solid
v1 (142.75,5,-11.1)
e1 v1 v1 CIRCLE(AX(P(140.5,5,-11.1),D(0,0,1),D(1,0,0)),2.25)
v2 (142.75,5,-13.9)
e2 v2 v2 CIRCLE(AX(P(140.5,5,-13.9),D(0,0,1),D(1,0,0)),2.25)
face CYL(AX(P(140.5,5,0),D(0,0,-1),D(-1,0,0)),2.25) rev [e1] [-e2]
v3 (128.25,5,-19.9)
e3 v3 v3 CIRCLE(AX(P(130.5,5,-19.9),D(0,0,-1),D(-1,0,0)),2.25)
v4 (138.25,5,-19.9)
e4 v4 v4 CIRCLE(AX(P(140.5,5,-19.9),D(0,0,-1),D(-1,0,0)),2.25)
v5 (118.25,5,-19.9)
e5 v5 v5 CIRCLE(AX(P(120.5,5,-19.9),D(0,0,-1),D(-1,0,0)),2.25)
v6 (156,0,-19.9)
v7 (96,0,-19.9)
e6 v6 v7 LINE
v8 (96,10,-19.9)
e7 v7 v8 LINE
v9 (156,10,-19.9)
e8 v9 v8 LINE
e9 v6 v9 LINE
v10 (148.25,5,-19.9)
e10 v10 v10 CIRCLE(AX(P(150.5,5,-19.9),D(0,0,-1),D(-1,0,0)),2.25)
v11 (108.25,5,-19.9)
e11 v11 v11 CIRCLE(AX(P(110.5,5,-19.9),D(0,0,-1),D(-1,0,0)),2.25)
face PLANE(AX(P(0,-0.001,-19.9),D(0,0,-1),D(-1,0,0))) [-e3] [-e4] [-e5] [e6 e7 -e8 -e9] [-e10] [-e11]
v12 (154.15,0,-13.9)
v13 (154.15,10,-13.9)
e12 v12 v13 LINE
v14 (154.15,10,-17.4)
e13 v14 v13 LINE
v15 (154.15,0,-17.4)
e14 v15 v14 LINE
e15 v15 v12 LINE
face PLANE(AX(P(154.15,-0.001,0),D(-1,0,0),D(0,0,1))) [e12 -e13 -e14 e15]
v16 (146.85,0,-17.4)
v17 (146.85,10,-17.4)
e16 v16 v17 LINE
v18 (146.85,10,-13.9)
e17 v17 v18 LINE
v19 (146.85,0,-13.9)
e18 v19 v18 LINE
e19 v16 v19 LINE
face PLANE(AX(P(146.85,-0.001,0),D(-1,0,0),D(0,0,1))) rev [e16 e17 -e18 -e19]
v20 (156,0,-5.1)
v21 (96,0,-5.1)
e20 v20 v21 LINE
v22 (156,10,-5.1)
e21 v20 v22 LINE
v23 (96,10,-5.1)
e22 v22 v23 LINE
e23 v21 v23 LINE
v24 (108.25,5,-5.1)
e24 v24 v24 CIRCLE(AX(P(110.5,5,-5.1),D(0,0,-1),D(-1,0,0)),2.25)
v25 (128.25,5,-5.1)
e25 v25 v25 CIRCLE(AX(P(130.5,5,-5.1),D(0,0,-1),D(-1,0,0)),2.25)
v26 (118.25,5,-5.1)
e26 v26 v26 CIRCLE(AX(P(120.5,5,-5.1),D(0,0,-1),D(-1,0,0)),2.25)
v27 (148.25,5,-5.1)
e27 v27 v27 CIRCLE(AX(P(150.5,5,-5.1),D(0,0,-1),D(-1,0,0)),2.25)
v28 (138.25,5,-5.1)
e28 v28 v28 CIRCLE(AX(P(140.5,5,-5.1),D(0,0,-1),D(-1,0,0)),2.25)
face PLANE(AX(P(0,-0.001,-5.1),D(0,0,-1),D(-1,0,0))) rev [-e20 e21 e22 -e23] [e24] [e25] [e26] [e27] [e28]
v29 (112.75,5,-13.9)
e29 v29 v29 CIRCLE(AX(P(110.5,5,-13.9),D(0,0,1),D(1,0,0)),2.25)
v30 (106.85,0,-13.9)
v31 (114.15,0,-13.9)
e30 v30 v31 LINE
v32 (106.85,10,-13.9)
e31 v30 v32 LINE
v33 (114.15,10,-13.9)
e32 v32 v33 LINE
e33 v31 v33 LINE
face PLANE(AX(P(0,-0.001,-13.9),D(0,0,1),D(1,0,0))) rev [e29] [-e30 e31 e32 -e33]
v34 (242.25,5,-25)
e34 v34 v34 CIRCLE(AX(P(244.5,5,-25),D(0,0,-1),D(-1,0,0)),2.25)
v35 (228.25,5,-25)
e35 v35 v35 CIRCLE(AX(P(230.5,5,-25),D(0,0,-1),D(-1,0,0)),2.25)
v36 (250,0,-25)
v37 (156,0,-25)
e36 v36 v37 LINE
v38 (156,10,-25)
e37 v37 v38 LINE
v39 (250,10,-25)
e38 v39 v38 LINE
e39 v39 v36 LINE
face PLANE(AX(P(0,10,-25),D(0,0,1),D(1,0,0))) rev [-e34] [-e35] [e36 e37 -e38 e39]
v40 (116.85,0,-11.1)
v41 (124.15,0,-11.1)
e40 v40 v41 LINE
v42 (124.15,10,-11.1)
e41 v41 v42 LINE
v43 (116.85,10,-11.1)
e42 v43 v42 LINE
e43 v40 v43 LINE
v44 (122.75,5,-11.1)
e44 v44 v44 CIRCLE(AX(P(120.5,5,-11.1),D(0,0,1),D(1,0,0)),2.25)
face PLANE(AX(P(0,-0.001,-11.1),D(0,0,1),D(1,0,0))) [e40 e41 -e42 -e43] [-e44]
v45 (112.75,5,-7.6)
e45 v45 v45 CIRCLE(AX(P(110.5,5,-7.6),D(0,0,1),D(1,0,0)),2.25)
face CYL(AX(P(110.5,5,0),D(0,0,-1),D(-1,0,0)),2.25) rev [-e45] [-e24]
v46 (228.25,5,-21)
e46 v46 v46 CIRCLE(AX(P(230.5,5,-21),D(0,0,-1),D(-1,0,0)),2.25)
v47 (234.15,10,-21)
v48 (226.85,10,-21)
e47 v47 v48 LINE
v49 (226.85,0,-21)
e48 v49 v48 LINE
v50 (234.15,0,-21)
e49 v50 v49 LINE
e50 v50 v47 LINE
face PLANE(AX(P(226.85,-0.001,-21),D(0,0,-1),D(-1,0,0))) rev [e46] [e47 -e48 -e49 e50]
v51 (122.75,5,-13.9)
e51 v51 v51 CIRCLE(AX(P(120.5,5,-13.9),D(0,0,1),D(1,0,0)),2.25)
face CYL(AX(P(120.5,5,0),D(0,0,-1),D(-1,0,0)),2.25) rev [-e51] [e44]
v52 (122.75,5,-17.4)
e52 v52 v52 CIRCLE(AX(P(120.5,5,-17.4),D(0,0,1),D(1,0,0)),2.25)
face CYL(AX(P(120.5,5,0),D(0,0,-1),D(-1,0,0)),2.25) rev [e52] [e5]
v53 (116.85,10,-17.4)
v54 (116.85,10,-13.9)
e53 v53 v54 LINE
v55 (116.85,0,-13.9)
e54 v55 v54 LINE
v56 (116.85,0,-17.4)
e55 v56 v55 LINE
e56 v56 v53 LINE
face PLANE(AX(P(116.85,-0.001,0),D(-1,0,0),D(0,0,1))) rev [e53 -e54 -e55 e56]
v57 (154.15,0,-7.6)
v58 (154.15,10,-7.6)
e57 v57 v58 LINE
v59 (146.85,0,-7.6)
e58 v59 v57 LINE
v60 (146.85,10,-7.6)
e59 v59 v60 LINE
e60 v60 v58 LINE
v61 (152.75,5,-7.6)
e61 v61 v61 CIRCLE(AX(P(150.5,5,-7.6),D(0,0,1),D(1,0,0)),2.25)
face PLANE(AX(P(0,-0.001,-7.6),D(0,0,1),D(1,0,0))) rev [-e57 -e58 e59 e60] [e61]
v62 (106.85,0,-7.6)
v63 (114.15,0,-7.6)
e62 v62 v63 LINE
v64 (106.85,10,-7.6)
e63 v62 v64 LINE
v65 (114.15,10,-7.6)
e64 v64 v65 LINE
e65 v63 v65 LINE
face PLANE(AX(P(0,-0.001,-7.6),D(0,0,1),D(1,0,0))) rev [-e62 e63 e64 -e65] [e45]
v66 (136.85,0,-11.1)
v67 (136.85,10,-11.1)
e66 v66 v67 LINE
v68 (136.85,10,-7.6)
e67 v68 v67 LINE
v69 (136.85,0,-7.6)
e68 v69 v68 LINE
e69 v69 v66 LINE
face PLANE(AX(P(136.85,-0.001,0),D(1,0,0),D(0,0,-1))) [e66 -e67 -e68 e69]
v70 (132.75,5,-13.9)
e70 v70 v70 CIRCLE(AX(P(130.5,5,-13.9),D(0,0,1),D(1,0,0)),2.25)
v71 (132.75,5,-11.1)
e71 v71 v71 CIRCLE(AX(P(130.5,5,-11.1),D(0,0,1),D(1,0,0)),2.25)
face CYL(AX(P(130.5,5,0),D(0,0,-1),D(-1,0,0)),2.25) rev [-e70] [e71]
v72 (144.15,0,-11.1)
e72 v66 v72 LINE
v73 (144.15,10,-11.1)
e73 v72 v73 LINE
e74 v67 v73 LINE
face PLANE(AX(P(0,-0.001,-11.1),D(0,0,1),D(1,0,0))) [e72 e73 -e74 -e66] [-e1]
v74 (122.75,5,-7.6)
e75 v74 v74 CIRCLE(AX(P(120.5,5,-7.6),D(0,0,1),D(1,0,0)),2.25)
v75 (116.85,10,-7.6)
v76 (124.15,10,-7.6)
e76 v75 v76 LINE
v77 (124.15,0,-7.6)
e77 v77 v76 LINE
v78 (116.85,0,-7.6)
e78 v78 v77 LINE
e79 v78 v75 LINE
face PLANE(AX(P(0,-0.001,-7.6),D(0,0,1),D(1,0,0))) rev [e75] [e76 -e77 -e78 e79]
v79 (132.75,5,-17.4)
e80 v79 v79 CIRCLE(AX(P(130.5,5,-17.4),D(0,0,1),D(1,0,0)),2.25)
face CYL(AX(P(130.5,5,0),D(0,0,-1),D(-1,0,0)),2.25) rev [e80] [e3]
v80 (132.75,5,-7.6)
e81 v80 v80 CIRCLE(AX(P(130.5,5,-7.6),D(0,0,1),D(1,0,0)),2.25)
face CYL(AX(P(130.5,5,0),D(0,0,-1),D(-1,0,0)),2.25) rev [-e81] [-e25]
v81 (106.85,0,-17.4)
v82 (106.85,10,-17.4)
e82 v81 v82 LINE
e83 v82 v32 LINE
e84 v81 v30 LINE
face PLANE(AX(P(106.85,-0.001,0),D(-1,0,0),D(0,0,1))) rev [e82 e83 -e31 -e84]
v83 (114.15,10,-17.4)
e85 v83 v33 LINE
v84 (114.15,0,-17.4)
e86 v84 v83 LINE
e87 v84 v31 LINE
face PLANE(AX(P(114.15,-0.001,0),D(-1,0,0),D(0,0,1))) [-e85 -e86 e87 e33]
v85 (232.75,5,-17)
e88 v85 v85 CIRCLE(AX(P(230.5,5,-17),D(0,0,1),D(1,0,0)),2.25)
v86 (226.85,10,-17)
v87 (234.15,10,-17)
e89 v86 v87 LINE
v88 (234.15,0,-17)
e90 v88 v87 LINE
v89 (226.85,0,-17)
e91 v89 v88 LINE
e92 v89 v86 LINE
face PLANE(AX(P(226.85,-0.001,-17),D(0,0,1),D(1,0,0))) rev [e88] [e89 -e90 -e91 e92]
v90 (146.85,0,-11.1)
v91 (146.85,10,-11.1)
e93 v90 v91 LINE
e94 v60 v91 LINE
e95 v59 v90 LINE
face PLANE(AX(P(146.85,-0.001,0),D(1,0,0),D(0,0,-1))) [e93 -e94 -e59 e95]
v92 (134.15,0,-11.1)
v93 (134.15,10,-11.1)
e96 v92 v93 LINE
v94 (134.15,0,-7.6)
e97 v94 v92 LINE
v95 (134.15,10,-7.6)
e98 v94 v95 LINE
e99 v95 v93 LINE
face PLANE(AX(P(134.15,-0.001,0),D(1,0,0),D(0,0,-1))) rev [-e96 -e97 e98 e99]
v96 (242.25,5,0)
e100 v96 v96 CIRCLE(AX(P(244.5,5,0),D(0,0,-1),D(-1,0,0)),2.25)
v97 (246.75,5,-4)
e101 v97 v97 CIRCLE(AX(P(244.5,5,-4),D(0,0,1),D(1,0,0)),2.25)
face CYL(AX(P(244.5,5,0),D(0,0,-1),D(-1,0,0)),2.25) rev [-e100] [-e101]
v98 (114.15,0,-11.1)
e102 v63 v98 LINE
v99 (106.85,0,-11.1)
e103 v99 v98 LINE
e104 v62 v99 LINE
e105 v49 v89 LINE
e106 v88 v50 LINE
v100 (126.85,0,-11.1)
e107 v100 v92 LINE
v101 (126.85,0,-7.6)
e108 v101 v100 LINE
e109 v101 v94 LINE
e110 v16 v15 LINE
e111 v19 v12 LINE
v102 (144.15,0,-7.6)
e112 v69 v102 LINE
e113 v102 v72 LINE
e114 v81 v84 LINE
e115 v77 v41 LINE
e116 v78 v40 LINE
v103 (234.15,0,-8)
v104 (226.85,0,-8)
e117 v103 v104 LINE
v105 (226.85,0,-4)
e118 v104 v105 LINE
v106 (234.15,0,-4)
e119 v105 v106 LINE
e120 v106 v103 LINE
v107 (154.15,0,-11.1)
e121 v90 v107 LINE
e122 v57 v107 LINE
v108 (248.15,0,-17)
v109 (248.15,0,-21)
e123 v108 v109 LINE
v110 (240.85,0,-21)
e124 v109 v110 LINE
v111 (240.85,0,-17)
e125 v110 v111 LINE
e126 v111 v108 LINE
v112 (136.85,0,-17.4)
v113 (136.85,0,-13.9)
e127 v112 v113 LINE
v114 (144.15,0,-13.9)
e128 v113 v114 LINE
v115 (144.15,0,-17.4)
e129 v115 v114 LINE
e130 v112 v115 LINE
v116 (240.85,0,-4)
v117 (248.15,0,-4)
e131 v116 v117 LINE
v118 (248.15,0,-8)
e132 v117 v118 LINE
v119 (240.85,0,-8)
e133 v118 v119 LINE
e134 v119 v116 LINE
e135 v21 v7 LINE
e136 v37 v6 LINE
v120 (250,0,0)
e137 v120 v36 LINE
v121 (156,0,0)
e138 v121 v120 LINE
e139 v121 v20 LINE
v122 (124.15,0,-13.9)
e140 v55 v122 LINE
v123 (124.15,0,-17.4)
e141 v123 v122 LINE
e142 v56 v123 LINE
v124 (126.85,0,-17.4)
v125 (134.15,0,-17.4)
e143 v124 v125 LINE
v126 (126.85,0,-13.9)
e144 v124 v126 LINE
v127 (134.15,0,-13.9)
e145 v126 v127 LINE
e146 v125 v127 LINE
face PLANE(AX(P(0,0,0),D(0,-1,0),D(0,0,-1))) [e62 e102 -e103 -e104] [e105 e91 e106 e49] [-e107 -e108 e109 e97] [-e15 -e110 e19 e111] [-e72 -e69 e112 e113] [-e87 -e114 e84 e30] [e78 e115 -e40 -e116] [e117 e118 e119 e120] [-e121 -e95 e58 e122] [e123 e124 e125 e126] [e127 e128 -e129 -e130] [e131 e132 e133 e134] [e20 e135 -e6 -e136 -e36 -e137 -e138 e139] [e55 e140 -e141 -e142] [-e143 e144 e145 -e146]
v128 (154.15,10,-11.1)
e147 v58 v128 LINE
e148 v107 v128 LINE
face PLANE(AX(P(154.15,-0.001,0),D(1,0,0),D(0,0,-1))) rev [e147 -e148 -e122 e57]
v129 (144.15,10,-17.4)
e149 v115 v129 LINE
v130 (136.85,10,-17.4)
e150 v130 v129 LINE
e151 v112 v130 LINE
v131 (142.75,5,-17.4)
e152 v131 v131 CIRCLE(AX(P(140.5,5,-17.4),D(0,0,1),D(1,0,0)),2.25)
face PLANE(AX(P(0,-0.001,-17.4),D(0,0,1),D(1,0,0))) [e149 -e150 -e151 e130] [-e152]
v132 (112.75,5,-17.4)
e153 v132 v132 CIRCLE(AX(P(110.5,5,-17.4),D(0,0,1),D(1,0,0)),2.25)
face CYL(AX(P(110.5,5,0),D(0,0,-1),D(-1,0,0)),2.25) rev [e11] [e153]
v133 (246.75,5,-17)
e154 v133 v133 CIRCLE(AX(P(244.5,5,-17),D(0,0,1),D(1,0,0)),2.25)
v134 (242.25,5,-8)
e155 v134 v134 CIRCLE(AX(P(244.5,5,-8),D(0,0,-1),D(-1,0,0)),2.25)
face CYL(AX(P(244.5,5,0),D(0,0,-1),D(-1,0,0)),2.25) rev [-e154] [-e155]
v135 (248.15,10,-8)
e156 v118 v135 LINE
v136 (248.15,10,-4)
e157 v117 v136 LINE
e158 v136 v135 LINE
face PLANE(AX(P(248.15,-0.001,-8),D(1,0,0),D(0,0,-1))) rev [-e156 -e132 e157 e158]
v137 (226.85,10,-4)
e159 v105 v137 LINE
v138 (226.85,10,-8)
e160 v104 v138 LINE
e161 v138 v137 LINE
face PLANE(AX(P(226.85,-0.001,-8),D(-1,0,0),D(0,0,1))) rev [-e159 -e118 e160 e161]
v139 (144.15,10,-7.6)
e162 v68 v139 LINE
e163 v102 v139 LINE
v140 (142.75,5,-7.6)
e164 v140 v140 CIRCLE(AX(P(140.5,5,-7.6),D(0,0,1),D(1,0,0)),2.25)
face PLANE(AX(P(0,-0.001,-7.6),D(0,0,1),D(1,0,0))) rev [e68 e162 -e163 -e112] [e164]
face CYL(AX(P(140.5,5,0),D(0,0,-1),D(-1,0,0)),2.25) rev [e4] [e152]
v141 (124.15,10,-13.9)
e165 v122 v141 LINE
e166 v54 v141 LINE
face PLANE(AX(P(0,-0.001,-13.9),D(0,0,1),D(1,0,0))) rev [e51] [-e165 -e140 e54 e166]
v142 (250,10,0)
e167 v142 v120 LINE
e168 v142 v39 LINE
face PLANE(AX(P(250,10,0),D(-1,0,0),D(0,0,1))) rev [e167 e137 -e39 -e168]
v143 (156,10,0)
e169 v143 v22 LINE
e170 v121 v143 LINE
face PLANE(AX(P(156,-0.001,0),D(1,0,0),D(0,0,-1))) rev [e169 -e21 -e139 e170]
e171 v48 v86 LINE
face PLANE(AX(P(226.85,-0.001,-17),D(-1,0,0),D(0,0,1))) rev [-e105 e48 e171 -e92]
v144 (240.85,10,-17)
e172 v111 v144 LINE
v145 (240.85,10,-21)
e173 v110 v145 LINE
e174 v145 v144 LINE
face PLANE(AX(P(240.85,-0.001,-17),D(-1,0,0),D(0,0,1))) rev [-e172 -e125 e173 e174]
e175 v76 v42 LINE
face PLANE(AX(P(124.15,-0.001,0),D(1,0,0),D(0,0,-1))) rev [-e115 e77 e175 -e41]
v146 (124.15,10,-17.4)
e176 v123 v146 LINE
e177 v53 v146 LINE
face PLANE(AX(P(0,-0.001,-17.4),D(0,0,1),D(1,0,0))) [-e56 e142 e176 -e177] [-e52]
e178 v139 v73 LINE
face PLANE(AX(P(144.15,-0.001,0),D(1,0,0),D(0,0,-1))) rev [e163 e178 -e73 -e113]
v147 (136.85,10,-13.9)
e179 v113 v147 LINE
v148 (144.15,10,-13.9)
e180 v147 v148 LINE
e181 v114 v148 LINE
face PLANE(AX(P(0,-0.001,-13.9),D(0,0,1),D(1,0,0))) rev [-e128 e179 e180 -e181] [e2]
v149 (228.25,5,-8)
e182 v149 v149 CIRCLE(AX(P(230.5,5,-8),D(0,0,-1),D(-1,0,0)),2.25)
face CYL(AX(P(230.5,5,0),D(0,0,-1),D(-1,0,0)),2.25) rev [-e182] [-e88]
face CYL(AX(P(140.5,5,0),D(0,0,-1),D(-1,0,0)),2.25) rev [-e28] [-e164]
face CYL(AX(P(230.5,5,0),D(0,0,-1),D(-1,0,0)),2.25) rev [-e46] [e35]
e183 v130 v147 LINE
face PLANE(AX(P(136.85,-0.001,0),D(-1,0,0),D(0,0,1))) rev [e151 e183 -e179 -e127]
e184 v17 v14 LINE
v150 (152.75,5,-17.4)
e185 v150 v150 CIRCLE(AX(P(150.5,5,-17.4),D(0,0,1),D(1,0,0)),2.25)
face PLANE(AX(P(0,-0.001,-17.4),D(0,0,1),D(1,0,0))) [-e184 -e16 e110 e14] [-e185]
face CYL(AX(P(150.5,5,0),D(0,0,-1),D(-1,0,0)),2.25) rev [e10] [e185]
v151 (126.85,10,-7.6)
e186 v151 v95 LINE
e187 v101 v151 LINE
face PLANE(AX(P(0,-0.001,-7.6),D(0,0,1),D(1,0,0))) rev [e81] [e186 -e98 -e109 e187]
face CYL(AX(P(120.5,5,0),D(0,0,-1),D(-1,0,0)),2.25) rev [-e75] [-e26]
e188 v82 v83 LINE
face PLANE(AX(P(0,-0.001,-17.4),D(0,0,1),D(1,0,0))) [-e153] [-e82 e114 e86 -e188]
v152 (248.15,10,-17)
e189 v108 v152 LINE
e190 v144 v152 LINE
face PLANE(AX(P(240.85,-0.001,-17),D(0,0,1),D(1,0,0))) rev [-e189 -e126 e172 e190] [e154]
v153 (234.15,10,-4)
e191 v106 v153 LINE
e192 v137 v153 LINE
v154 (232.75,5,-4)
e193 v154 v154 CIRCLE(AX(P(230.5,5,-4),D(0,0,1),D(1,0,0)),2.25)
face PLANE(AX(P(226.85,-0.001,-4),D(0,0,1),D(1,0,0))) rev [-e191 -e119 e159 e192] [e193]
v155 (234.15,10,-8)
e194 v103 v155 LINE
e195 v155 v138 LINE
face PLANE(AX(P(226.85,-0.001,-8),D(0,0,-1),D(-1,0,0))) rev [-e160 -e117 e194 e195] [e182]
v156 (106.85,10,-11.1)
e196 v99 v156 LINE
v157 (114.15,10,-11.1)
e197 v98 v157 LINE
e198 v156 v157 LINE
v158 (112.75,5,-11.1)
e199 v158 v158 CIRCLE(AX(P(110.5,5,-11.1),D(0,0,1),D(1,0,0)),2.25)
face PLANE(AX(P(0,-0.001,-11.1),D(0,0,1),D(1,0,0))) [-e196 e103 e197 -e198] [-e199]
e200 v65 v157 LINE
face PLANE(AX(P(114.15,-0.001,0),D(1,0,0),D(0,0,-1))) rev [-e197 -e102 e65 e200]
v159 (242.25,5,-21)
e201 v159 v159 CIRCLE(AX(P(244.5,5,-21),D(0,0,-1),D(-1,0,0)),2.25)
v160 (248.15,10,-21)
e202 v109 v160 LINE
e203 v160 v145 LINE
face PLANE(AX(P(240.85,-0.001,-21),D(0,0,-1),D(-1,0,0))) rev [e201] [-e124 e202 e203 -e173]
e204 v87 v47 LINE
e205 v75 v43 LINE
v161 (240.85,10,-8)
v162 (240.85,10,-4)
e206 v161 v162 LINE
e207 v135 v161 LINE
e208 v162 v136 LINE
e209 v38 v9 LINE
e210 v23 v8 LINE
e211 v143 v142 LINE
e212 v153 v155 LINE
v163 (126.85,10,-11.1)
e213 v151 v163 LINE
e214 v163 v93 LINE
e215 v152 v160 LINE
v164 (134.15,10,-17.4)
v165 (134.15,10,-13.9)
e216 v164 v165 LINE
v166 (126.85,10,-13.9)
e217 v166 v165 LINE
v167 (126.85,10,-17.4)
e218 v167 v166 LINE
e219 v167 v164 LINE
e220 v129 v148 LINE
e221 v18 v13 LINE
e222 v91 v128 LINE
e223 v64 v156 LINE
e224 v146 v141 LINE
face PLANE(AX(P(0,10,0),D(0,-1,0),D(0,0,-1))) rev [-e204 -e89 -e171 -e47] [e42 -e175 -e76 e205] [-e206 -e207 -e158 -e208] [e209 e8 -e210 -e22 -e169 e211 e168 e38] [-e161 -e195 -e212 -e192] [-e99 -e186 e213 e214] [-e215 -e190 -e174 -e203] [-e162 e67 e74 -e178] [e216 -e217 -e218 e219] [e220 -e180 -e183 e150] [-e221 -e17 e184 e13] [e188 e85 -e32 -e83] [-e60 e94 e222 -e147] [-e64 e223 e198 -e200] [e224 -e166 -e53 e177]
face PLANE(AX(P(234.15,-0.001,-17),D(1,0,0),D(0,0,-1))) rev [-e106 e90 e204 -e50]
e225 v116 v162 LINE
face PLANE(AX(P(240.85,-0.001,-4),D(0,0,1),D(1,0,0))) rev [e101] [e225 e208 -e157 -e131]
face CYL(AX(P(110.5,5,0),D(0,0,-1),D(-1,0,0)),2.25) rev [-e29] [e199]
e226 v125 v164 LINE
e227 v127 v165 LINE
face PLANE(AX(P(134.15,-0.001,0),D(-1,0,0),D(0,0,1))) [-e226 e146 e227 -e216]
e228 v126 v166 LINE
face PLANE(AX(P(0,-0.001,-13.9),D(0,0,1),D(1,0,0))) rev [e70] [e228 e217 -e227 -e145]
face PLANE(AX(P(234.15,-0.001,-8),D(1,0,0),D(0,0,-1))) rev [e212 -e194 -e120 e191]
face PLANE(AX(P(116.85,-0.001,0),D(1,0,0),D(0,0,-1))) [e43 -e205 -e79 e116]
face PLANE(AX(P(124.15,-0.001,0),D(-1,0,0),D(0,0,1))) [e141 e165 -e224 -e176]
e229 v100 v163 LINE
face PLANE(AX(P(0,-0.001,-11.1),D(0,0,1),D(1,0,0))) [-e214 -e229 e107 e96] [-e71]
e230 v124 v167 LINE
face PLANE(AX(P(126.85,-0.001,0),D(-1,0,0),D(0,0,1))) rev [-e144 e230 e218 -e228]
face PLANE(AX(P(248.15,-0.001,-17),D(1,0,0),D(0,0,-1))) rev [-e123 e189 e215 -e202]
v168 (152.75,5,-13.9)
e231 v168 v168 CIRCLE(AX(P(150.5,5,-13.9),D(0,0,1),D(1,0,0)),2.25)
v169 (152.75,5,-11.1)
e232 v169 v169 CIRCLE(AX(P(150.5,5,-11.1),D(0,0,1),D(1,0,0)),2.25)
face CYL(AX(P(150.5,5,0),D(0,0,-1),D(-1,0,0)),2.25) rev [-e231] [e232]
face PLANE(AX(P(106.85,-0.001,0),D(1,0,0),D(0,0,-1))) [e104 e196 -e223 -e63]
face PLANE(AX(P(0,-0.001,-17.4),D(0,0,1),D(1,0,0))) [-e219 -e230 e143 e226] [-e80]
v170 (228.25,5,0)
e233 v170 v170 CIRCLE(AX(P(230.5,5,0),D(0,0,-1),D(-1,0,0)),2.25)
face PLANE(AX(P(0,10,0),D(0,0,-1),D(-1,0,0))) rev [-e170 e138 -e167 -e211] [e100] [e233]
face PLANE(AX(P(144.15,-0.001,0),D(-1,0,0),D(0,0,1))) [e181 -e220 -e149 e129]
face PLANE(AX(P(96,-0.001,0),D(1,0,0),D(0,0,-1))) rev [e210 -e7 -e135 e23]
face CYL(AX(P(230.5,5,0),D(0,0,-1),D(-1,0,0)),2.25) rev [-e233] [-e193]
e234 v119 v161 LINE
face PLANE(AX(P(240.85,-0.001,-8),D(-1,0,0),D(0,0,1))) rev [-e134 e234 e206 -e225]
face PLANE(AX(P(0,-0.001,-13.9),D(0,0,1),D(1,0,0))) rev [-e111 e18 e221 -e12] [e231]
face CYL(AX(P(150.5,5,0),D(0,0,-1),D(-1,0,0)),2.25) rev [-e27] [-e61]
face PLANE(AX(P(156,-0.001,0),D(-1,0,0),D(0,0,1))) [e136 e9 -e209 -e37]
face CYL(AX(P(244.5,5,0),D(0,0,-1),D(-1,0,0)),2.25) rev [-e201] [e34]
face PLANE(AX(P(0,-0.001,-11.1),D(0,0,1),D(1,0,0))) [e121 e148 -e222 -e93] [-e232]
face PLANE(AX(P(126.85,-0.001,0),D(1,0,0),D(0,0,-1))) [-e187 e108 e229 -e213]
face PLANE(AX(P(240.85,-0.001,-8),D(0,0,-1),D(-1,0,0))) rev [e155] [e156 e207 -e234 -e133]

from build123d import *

# Parameters (mm, degrees)
SKETCH1_W              = 250
SKETCH1_H              = 25
BOSS_EXTRUDE1_DEPTH    = 10
CUT_EXTRUDE1_REACH     = 253.446
SKETCH2_R              = 2.15
FILLET1_R              = 12.5
SKETCH3_R              = 2.25
CUT_EXTRUDE2_DEPTH     = 252.445819214
CUT_EXTRUDE5_REACH     = 253.446
SKETCH5_W              = 7.3
SKETCH5_H              = 4
SKETCH6_R              = 10
CUT_EXTRUDE6_DEPTH     = 5
CUT_EXTRUDE7_REACH     = 253.297
SKETCH7_R              = 1.65
CUT_EXTRUDE8_START     = -3.2
CUT_EXTRUDE8_OUTLINE_W = 6
CUT_EXTRUDE8_OUTLINE_H = 6
CUT_EXTRUDE8_DEPTH     = 6.4
SKETCH9_R              = 3
CUT_EXTRUDE9_DEPTH     = 2
CUT_EXTRUDE10_REACH    = 253.446
SKETCH10_W             = 60
SKETCH10_H             = 5.1
SKETCH10_W_2           = 7.3
SKETCH10_H_2           = 3.5
SKETCH11_R             = 2.25
CUT_EXTRUDE11_DEPTH    = 251.990059564


# Read off the part's stored shape, not the designer's step: Cut-Extrude8
with BuildPart() as part:
    # Sketch1 → Boss-Extrude1 (new body)
    with BuildSketch(Plane(origin=(0, 0, 0), x_dir=(1, 0, 0), z_dir=(0, 1, 0))):
        with Locations((125, 12.5)):
            Rectangle(SKETCH1_W, SKETCH1_H)
    extrude(amount=BOSS_EXTRUDE1_DEPTH)

    # Sketch2 → Cut-Extrude1 (cut, up to next)
    with BuildSketch(Plane(origin=(0, 10, 0), x_dir=(1, 0, 0), z_dir=(0, 1, 0)), mode=Mode.PRIVATE) as cut_extrude1_sk1:
        with Locations(Location((12.5, 12.5, 0), (0, 0, 270))):
            Circle(SKETCH2_R)
    cut_extrude1_tool1 = extrude(cut_extrude1_sk1.sketch, amount=-CUT_EXTRUDE1_REACH, mode=Mode.PRIVATE) & part.part
    add(cut_extrude1_tool1.solids().sort_by_distance((12.5, 10, -12.5))[0], mode=Mode.SUBTRACT)

    # Fillet1
    fillet1_edges = [part.edges().sort_by_distance(p)[0] for p in [
        (0, 5, 0),
        (0, 5, -25),
    ]]
    fillet(fillet1_edges, radius=FILLET1_R - 0.0001)  # a hair under: the kernel refuses the full size

    # Sketch3 → Cut-Extrude2 (cut, through all)
    with BuildSketch(Plane(origin=(0, 0, -25), x_dir=(-1, 0, 0), z_dir=(0, 0, -1))):
        with Locations((-244.5, 5)):
            Circle(SKETCH3_R)
        with Locations((-230.5, 5)):
            Circle(SKETCH3_R)
    extrude(amount=-CUT_EXTRUDE2_DEPTH, mode=Mode.SUBTRACT)

    # Sketch5 → Cut-Extrude5 (cut, up to next)
    with BuildSketch(Plane(origin=(0, 10, 0), x_dir=(1, 0, 0), z_dir=(0, 1, 0)), mode=Mode.PRIVATE) as cut_extrude5_sk1:
        with Locations((244.5, 19)):
            Rectangle(SKETCH5_W, SKETCH5_H)
    cut_extrude5_tool1 = extrude(cut_extrude5_sk1.sketch, amount=-CUT_EXTRUDE5_REACH, mode=Mode.PRIVATE) & part.part
    # Sketch5 → Cut-Extrude5 (cut, up to next)
    with BuildSketch(Plane(origin=(0, 10, 0), x_dir=(1, 0, 0), z_dir=(0, 1, 0)), mode=Mode.PRIVATE) as cut_extrude5_sk2:
        with Locations((244.5, 6)):
            Rectangle(SKETCH5_W, SKETCH5_H)
    cut_extrude5_tool2 = extrude(cut_extrude5_sk2.sketch, amount=-CUT_EXTRUDE5_REACH, mode=Mode.PRIVATE) & part.part
    # Sketch5 → Cut-Extrude5 (cut, up to next)
    with BuildSketch(Plane(origin=(0, 10, 0), x_dir=(1, 0, 0), z_dir=(0, 1, 0)), mode=Mode.PRIVATE) as cut_extrude5_sk3:
        with Locations((230.5, 19)):
            Rectangle(SKETCH5_W, SKETCH5_H)
    cut_extrude5_tool3 = extrude(cut_extrude5_sk3.sketch, amount=-CUT_EXTRUDE5_REACH, mode=Mode.PRIVATE) & part.part
    # Sketch5 → Cut-Extrude5 (cut, up to next)
    with BuildSketch(Plane(origin=(0, 10, 0), x_dir=(1, 0, 0), z_dir=(0, 1, 0)), mode=Mode.PRIVATE) as cut_extrude5_sk4:
        with Locations((230.5, 6)):
            Rectangle(SKETCH5_W, SKETCH5_H)
    cut_extrude5_tool4 = extrude(cut_extrude5_sk4.sketch, amount=-CUT_EXTRUDE5_REACH, mode=Mode.PRIVATE) & part.part
    add(cut_extrude5_tool1.solids().sort_by_distance((244.5, 10, -19))[0], mode=Mode.SUBTRACT)
    add(cut_extrude5_tool2.solids().sort_by_distance((244.5, 10, -6))[0], mode=Mode.SUBTRACT)
    add(cut_extrude5_tool3.solids().sort_by_distance((230.5, 10, -19))[0], mode=Mode.SUBTRACT)
    add(cut_extrude5_tool4.solids().sort_by_distance((230.5, 10, -6))[0], mode=Mode.SUBTRACT)

    # Sketch6 → Cut-Extrude6 (cut)
    with BuildSketch(Plane.XZ):
        with Locations(Location((12.5, -12.5, 0), (0, 0, 270))):
            Circle(SKETCH6_R)
    extrude(amount=-CUT_EXTRUDE6_DEPTH, mode=Mode.SUBTRACT)

    # Sketch7 → Cut-Extrude7 (cut, up to next)
    with BuildSketch(Plane.XZ.offset(-5), mode=Mode.PRIVATE) as cut_extrude7_sk1:
        with Locations(Location((12.5, -6, 0), (0, 0, 270))):
            Circle(SKETCH7_R)
    cut_extrude7_tool1 = extrude(cut_extrude7_sk1.sketch, amount=-CUT_EXTRUDE7_REACH, mode=Mode.PRIVATE) & part.part
    # Sketch7 → Cut-Extrude7 (cut, up to next)
    with BuildSketch(Plane.XZ.offset(-5), mode=Mode.PRIVATE) as cut_extrude7_sk2:
        with Locations(Location((19, -12.5, 0), (0, 0, 270))):
            Circle(SKETCH7_R)
    cut_extrude7_tool2 = extrude(cut_extrude7_sk2.sketch, amount=-CUT_EXTRUDE7_REACH, mode=Mode.PRIVATE) & part.part
    # Sketch7 → Cut-Extrude7 (cut, up to next)
    with BuildSketch(Plane.XZ.offset(-5), mode=Mode.PRIVATE) as cut_extrude7_sk3:
        with Locations(Location((12.5, -19, 0), (0, 0, 270))):
            Circle(SKETCH7_R)
    cut_extrude7_tool3 = extrude(cut_extrude7_sk3.sketch, amount=-CUT_EXTRUDE7_REACH, mode=Mode.PRIVATE) & part.part
    # Sketch7 → Cut-Extrude7 (cut, up to next)
    with BuildSketch(Plane.XZ.offset(-5), mode=Mode.PRIVATE) as cut_extrude7_sk4:
        with Locations(Location((6, -12.5, 0), (0, 0, 270))):
            Circle(SKETCH7_R)
    cut_extrude7_tool4 = extrude(cut_extrude7_sk4.sketch, amount=-CUT_EXTRUDE7_REACH, mode=Mode.PRIVATE) & part.part
    add(cut_extrude7_tool1.solids().sort_by_distance((12.5, 5, -6))[0], mode=Mode.SUBTRACT)
    add(cut_extrude7_tool2.solids().sort_by_distance((19, 5, -12.5))[0], mode=Mode.SUBTRACT)
    add(cut_extrude7_tool3.solids().sort_by_distance((12.5, 5, -19))[0], mode=Mode.SUBTRACT)
    add(cut_extrude7_tool4.solids().sort_by_distance((6, 5, -12.5))[0], mode=Mode.SUBTRACT)

    # Cut-Extrude8 outline → Cut-Extrude8 (cut)
    with BuildSketch(Plane(origin=(0, 0, 0), x_dir=(0.707106781186548, 0, -0.707106781186547), z_dir=(0.707106781186547, 0, 0.707106781186548)).offset(CUT_EXTRUDE8_START)):
        with Locations((7, 2)):
            Rectangle(CUT_EXTRUDE8_OUTLINE_W, CUT_EXTRUDE8_OUTLINE_H)
    extrude(amount=CUT_EXTRUDE8_DEPTH, mode=Mode.SUBTRACT)

    # Sketch9 → Cut-Extrude9 (cut)
    with BuildSketch(Plane(origin=(0, 10, 0), x_dir=(1, 0, 0), z_dir=(0, 1, 0))):
        with Locations(Location((12.5, 19, 0), (0, 0, 270))):
            Circle(SKETCH9_R)
        with Locations(Location((19, 12.5, 0), (0, 0, 270))):
            Circle(SKETCH9_R)
        with Locations(Location((12.5, 6, 0), (0, 0, 270))):
            Circle(SKETCH9_R)
        with Locations(Location((6, 12.5, 0), (0, 0, 270))):
            Circle(SKETCH9_R)
    extrude(amount=-CUT_EXTRUDE9_DEPTH, mode=Mode.SUBTRACT)

    # Sketch10 → Cut-Extrude10 (cut, up to next)
    with BuildSketch(Plane(origin=(0, 10, 0), x_dir=(1, 0, 0), z_dir=(0, 1, 0)), mode=Mode.PRIVATE) as cut_extrude10_sk1:
        Polygon((0, 25), (0, 0), (96, 0), (96, 5.1), (96, 19.9), (96, 25), align=None)
    cut_extrude10_tool1 = extrude(cut_extrude10_sk1.sketch, amount=-CUT_EXTRUDE10_REACH, mode=Mode.PRIVATE) & part.part
    # Sketch10 → Cut-Extrude10 (cut, up to next)
    with BuildSketch(Plane(origin=(0, 10, 0), x_dir=(1, 0, 0), z_dir=(0, 1, 0)), mode=Mode.PRIVATE) as cut_extrude10_sk2:
        with Locations((126, 2.55)):
            Rectangle(SKETCH10_W, SKETCH10_H)
    cut_extrude10_tool2 = extrude(cut_extrude10_sk2.sketch, amount=-CUT_EXTRUDE10_REACH, mode=Mode.PRIVATE) & part.part
    # Sketch10 → Cut-Extrude10 (cut, up to next)
    with BuildSketch(Plane(origin=(0, 10, 0), x_dir=(1, 0, 0), z_dir=(0, 1, 0)), mode=Mode.PRIVATE) as cut_extrude10_sk3:
        with Locations((126, 22.45)):
            Rectangle(SKETCH10_W, SKETCH10_H)
    cut_extrude10_tool3 = extrude(cut_extrude10_sk3.sketch, amount=-CUT_EXTRUDE10_REACH, mode=Mode.PRIVATE) & part.part
    # Sketch10 → Cut-Extrude10 (cut, up to next)
    with BuildSketch(Plane(origin=(0, 10, 0), x_dir=(1, 0, 0), z_dir=(0, 1, 0)), mode=Mode.PRIVATE) as cut_extrude10_sk4:
        with Locations((140.5, 15.65)):
            Rectangle(SKETCH10_W_2, SKETCH10_H_2)
    cut_extrude10_tool4 = extrude(cut_extrude10_sk4.sketch, amount=-CUT_EXTRUDE10_REACH, mode=Mode.PRIVATE) & part.part
    # Sketch10 → Cut-Extrude10 (cut, up to next)
    with BuildSketch(Plane(origin=(0, 10, 0), x_dir=(1, 0, 0), z_dir=(0, 1, 0)), mode=Mode.PRIVATE) as cut_extrude10_sk5:
        with Locations((150.5, 15.65)):
            Rectangle(SKETCH10_W_2, SKETCH10_H_2)
    cut_extrude10_tool5 = extrude(cut_extrude10_sk5.sketch, amount=-CUT_EXTRUDE10_REACH, mode=Mode.PRIVATE) & part.part
    # Sketch10 → Cut-Extrude10 (cut, up to next)
    with BuildSketch(Plane(origin=(0, 10, 0), x_dir=(1, 0, 0), z_dir=(0, 1, 0)), mode=Mode.PRIVATE) as cut_extrude10_sk6:
        with Locations((130.5, 15.65)):
            Rectangle(SKETCH10_W_2, SKETCH10_H_2)
    cut_extrude10_tool6 = extrude(cut_extrude10_sk6.sketch, amount=-CUT_EXTRUDE10_REACH, mode=Mode.PRIVATE) & part.part
    # Sketch10 → Cut-Extrude10 (cut, up to next)
    with BuildSketch(Plane(origin=(0, 10, 0), x_dir=(1, 0, 0), z_dir=(0, 1, 0)), mode=Mode.PRIVATE) as cut_extrude10_sk7:
        with Locations((120.5, 15.65)):
            Rectangle(SKETCH10_W_2, SKETCH10_H_2)
    cut_extrude10_tool7 = extrude(cut_extrude10_sk7.sketch, amount=-CUT_EXTRUDE10_REACH, mode=Mode.PRIVATE) & part.part
    # Sketch10 → Cut-Extrude10 (cut, up to next)
    with BuildSketch(Plane(origin=(0, 10, 0), x_dir=(1, 0, 0), z_dir=(0, 1, 0)), mode=Mode.PRIVATE) as cut_extrude10_sk8:
        with Locations((110.5, 15.65)):
            Rectangle(SKETCH10_W_2, SKETCH10_H_2)
    cut_extrude10_tool8 = extrude(cut_extrude10_sk8.sketch, amount=-CUT_EXTRUDE10_REACH, mode=Mode.PRIVATE) & part.part
    # Sketch10 → Cut-Extrude10 (cut, up to next)
    with BuildSketch(Plane(origin=(0, 10, 0), x_dir=(1, 0, 0), z_dir=(0, 1, 0)), mode=Mode.PRIVATE) as cut_extrude10_sk9:
        with Locations((150.5, 9.35)):
            Rectangle(SKETCH10_W_2, SKETCH10_H_2)
    cut_extrude10_tool9 = extrude(cut_extrude10_sk9.sketch, amount=-CUT_EXTRUDE10_REACH, mode=Mode.PRIVATE) & part.part
    # Sketch10 → Cut-Extrude10 (cut, up to next)
    with BuildSketch(Plane(origin=(0, 10, 0), x_dir=(1, 0, 0), z_dir=(0, 1, 0)), mode=Mode.PRIVATE) as cut_extrude10_sk10:
        with Locations((140.5, 9.35)):
            Rectangle(SKETCH10_W_2, SKETCH10_H_2)
    cut_extrude10_tool10 = extrude(cut_extrude10_sk10.sketch, amount=-CUT_EXTRUDE10_REACH, mode=Mode.PRIVATE) & part.part
    # Sketch10 → Cut-Extrude10 (cut, up to next)
    with BuildSketch(Plane(origin=(0, 10, 0), x_dir=(1, 0, 0), z_dir=(0, 1, 0)), mode=Mode.PRIVATE) as cut_extrude10_sk11:
        with Locations((130.5, 9.35)):
            Rectangle(SKETCH10_W_2, SKETCH10_H_2)
    cut_extrude10_tool11 = extrude(cut_extrude10_sk11.sketch, amount=-CUT_EXTRUDE10_REACH, mode=Mode.PRIVATE) & part.part
    # Sketch10 → Cut-Extrude10 (cut, up to next)
    with BuildSketch(Plane(origin=(0, 10, 0), x_dir=(1, 0, 0), z_dir=(0, 1, 0)), mode=Mode.PRIVATE) as cut_extrude10_sk12:
        with Locations((120.5, 9.35)):
            Rectangle(SKETCH10_W_2, SKETCH10_H_2)
    cut_extrude10_tool12 = extrude(cut_extrude10_sk12.sketch, amount=-CUT_EXTRUDE10_REACH, mode=Mode.PRIVATE) & part.part
    # Sketch10 → Cut-Extrude10 (cut, up to next)
    with BuildSketch(Plane(origin=(0, 10, 0), x_dir=(1, 0, 0), z_dir=(0, 1, 0)), mode=Mode.PRIVATE) as cut_extrude10_sk13:
        with Locations((110.5, 9.35)):
            Rectangle(SKETCH10_W_2, SKETCH10_H_2)
    cut_extrude10_tool13 = extrude(cut_extrude10_sk13.sketch, amount=-CUT_EXTRUDE10_REACH, mode=Mode.PRIVATE) & part.part
    add(cut_extrude10_tool1.solids().sort_by_distance((48, 10, -12.5))[0], mode=Mode.SUBTRACT)
    add(cut_extrude10_tool2.solids().sort_by_distance((126, 10, -2.55))[0], mode=Mode.SUBTRACT)
    add(cut_extrude10_tool3.solids().sort_by_distance((126, 10, -22.45))[0], mode=Mode.SUBTRACT)
    add(cut_extrude10_tool4.solids().sort_by_distance((140.5, 10, -15.65))[0], mode=Mode.SUBTRACT)
    add(cut_extrude10_tool5.solids().sort_by_distance((150.5, 10, -15.65))[0], mode=Mode.SUBTRACT)
    add(cut_extrude10_tool6.solids().sort_by_distance((130.5, 10, -15.65))[0], mode=Mode.SUBTRACT)
    add(cut_extrude10_tool7.solids().sort_by_distance((120.5, 10, -15.65))[0], mode=Mode.SUBTRACT)
    add(cut_extrude10_tool8.solids().sort_by_distance((110.5, 10, -15.65))[0], mode=Mode.SUBTRACT)
    add(cut_extrude10_tool9.solids().sort_by_distance((150.5, 10, -9.35))[0], mode=Mode.SUBTRACT)
    add(cut_extrude10_tool10.solids().sort_by_distance((140.5, 10, -9.35))[0], mode=Mode.SUBTRACT)
    add(cut_extrude10_tool11.solids().sort_by_distance((130.5, 10, -9.35))[0], mode=Mode.SUBTRACT)
    add(cut_extrude10_tool12.solids().sort_by_distance((120.5, 10, -9.35))[0], mode=Mode.SUBTRACT)
    add(cut_extrude10_tool13.solids().sort_by_distance((110.5, 10, -9.35))[0], mode=Mode.SUBTRACT)

    # Sketch11 → Cut-Extrude11 (cut, through all)
    with BuildSketch(Plane(origin=(0, 0, -19.9), x_dir=(-1, 0, 0), z_dir=(0, 0, -1))):
        with Locations((-150.5, 5)):
            Circle(SKETCH11_R)
        with Locations(Location((-140.5, 5, 0), (0, 0, 180))):
            Circle(SKETCH11_R)
        with Locations((-130.5, 5)):
            Circle(SKETCH11_R)
        with Locations(Location((-120.5, 5, 0), (0, 0, 180))):
            Circle(SKETCH11_R)
        with Locations(Location((-110.5, 5, 0), (0, 0, 180))):
            Circle(SKETCH11_R)
    extrude(amount=-CUT_EXTRUDE11_DEPTH, mode=Mode.SUBTRACT)


solid = part.part
